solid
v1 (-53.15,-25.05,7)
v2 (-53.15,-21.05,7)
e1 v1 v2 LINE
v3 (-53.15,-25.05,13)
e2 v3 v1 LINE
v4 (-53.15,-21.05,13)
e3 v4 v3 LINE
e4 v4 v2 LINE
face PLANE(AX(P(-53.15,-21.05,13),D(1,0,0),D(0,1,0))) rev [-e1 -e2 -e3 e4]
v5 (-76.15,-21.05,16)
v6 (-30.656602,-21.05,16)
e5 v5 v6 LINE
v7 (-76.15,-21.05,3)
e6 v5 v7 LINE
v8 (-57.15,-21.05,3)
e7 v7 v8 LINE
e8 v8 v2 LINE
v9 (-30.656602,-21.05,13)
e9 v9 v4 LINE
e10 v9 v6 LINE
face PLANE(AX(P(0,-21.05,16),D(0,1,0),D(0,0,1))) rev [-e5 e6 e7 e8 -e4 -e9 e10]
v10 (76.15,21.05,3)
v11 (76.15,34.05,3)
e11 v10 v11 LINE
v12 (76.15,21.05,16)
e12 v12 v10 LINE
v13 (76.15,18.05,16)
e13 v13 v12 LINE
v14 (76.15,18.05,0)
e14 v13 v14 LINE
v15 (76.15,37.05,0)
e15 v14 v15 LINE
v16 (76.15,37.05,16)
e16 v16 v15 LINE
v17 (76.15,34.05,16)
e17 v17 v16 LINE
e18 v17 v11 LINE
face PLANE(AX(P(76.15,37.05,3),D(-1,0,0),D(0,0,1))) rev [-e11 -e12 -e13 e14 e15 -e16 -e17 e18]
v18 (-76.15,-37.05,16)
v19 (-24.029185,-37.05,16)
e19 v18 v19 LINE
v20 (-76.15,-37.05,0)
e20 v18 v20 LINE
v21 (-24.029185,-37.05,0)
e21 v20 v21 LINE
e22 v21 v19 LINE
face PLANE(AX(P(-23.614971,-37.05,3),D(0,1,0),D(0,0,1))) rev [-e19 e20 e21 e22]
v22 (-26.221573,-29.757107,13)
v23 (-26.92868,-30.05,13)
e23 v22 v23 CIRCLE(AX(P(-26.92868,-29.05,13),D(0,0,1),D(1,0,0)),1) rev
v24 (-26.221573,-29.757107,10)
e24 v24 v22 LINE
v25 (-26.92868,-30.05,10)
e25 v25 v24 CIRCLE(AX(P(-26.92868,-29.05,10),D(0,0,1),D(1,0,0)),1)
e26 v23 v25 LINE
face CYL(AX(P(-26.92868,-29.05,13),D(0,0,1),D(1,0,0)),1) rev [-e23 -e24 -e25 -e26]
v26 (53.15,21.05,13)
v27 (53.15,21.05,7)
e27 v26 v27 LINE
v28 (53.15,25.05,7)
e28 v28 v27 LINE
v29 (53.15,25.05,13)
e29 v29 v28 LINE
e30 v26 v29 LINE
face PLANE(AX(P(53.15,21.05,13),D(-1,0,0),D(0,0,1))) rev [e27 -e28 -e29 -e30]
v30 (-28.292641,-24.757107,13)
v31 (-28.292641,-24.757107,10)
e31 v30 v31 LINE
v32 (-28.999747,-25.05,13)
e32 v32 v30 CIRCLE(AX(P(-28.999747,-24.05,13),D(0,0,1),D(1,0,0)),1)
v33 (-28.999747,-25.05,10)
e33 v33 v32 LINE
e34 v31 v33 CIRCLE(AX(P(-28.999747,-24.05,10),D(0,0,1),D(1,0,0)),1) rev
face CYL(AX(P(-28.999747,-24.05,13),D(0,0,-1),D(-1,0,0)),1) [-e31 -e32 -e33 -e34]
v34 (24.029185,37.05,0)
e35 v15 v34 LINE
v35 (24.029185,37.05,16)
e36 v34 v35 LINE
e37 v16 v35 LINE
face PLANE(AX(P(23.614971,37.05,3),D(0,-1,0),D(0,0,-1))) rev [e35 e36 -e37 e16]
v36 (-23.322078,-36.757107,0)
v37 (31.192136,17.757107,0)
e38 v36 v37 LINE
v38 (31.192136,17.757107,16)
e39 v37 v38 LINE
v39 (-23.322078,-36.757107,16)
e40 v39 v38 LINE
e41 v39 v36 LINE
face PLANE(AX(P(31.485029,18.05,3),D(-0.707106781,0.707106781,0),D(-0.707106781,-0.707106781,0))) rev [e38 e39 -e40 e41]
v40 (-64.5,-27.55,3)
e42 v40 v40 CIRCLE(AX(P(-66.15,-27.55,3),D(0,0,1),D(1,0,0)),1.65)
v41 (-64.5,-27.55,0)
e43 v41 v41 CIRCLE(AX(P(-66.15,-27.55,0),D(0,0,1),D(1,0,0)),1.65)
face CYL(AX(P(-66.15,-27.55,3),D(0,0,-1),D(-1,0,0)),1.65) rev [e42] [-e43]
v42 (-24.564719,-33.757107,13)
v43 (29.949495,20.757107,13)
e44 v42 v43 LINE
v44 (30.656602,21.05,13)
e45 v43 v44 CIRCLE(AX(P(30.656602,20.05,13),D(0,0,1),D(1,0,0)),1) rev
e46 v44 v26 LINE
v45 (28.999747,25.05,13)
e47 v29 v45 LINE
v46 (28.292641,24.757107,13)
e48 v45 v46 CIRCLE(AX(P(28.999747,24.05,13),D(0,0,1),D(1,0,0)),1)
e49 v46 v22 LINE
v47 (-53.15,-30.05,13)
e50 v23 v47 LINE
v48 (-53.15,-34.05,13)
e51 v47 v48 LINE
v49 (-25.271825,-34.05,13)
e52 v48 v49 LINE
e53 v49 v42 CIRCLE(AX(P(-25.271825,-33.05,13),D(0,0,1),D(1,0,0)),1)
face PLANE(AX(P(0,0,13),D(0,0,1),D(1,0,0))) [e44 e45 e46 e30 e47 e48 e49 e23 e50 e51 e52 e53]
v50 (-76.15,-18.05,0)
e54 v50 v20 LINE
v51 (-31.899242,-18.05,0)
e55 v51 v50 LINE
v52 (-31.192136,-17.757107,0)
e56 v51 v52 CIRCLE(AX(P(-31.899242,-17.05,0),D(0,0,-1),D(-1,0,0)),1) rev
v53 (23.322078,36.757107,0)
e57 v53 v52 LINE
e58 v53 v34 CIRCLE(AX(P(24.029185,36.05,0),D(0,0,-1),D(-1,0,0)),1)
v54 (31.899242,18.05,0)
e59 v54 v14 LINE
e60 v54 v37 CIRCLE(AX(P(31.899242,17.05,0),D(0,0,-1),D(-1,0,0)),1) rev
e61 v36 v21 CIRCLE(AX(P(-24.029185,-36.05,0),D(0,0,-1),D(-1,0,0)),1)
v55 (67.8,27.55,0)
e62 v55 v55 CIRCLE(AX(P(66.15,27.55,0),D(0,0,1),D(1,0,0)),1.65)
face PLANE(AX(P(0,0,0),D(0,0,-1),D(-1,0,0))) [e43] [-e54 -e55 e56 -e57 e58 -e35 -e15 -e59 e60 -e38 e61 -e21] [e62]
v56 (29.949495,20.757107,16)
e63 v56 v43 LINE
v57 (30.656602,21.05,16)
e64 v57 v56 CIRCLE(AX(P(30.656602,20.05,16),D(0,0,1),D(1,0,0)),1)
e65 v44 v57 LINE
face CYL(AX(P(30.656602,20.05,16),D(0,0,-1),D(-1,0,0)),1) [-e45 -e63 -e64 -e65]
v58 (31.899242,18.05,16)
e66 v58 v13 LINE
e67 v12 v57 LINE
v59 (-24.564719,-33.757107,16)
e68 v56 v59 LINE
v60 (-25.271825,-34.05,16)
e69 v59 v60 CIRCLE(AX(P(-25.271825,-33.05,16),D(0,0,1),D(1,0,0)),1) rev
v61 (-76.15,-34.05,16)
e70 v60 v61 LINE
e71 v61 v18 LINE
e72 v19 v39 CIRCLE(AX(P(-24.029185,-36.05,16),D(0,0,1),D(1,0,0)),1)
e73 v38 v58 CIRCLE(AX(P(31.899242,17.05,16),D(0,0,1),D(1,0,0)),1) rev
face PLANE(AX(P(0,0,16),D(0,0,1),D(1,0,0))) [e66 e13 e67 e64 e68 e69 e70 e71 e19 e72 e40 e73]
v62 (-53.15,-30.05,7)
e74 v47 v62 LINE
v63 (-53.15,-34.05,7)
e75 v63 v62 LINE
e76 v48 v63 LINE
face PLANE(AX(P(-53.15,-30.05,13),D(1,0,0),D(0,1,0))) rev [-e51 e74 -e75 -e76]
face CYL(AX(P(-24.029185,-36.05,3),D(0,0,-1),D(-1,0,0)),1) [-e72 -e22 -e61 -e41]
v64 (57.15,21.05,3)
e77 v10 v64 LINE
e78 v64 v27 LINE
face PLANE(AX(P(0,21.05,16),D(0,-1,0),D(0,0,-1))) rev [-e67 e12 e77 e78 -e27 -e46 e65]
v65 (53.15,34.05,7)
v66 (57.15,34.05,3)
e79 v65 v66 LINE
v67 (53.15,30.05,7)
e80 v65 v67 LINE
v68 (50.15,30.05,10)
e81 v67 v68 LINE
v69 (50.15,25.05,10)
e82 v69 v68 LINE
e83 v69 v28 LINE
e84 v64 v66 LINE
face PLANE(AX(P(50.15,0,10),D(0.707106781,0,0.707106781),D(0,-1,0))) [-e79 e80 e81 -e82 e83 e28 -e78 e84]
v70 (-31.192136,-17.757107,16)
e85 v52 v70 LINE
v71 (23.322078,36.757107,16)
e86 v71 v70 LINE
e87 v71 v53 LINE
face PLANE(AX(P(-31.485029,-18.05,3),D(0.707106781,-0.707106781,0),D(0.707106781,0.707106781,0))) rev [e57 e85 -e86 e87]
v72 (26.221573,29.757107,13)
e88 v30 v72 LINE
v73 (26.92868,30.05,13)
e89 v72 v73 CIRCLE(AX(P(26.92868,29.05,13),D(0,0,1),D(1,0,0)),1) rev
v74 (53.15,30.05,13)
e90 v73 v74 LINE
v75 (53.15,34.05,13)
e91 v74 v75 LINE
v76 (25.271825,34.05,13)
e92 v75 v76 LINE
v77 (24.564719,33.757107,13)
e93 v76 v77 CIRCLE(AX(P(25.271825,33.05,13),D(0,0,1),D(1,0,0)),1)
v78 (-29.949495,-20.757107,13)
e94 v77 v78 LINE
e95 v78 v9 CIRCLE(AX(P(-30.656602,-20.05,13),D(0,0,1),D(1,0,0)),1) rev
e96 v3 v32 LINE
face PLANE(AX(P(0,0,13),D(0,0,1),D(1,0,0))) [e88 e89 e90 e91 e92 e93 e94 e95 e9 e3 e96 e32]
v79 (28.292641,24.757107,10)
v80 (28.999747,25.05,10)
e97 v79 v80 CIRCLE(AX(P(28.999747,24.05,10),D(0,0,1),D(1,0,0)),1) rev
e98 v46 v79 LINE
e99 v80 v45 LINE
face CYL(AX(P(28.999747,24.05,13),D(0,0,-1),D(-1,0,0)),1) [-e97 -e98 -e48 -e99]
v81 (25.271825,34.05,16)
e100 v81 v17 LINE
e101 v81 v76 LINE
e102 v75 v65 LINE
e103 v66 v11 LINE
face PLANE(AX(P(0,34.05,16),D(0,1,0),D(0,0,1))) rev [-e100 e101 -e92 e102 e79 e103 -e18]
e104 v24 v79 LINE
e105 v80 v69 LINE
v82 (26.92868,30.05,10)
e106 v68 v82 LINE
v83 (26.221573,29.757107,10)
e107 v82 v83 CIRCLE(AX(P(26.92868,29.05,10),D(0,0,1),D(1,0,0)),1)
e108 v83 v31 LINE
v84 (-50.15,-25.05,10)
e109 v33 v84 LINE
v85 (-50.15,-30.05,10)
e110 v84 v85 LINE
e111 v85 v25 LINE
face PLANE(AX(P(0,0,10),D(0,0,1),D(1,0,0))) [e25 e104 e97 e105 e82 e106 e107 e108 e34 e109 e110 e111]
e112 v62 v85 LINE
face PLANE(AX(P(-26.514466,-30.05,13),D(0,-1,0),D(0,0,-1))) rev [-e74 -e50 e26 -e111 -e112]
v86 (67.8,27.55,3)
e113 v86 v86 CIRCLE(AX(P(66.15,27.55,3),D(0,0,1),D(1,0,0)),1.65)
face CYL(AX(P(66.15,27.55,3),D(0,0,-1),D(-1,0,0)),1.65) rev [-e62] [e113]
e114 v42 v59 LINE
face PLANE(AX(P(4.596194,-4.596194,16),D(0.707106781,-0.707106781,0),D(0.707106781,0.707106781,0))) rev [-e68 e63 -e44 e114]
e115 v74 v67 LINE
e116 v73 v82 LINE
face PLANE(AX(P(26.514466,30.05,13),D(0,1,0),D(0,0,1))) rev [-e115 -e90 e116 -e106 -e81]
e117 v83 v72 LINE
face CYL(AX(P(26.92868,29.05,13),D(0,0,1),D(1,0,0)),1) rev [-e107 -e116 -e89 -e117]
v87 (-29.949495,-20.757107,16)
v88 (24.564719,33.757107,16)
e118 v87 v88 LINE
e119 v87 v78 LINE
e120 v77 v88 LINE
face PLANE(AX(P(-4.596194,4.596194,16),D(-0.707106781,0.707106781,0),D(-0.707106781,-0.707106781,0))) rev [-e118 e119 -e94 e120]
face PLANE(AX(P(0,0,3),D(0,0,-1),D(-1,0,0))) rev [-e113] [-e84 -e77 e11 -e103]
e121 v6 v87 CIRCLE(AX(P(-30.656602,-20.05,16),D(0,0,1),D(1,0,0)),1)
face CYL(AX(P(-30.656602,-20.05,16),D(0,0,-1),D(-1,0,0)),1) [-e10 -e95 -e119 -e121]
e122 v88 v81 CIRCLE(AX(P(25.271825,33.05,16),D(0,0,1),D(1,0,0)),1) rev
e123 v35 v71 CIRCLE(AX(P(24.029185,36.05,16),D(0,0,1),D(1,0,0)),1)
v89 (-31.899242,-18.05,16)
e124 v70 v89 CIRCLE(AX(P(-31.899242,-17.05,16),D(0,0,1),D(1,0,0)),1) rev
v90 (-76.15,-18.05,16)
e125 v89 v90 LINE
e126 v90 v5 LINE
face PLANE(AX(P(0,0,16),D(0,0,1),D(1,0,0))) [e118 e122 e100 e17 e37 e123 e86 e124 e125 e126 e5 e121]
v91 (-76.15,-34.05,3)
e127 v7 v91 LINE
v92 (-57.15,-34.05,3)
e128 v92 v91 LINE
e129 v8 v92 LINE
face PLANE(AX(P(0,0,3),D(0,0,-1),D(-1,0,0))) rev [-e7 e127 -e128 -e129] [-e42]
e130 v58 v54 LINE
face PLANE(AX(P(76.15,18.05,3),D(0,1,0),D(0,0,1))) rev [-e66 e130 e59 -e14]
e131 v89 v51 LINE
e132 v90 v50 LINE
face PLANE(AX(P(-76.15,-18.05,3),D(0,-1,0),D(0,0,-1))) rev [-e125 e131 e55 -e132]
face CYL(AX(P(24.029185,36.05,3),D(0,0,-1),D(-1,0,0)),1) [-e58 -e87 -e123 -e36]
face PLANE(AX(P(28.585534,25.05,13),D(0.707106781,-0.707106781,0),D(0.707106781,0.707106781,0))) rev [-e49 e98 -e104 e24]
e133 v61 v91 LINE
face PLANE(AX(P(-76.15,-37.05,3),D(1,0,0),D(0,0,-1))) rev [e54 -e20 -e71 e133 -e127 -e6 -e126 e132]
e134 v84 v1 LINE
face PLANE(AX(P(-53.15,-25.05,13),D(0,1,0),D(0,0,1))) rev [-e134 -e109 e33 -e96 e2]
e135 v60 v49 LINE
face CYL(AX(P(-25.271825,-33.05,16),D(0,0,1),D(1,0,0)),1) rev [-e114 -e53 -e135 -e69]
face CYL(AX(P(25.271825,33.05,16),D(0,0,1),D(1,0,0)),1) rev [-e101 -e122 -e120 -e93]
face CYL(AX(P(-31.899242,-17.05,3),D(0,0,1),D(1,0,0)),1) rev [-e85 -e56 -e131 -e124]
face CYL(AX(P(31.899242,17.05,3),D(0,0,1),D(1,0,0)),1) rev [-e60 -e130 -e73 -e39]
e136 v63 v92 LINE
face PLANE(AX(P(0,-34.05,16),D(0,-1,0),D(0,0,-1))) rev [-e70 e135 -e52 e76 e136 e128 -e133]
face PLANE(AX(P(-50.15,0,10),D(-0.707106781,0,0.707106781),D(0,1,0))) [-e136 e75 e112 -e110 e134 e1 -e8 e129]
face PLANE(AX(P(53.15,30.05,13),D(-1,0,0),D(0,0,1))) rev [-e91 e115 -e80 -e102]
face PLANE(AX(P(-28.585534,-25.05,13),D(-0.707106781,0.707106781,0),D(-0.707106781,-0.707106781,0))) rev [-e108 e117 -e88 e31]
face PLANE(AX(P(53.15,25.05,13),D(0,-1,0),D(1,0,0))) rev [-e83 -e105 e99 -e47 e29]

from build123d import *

# Parameters (mm, degrees)
SKETCH_10_R     = 1.65
EXTRUDE_1_DEPTH = 3
EXTRUDE_START   = 3
EXTRUDE_2_DEPTH = 7
EXTRUDE_3_DEPTH = 13
CHAMFER_1_SIZE  = 7
EXTRUDE_5_DEPTH = 10
FILLET_1_R      = 1


with BuildPart() as part:
    # 草图10 → 凸台-拉伸1 (new body)
    with BuildSketch(Plane.XY):
        Polygon((-76.15, -18.05), (-31.485028843, -18.05), (23.614971157, 37.05), (76.15, 37.05), (76.15, 18.05), (31.485028843, 18.05), (-23.614971157, -37.05), (-76.15, -37.05), align=None)
        with Locations((-66.15, -27.55)):
            Circle(SKETCH_10_R, mode=Mode.SUBTRACT)
        with Locations((66.15, 27.55)):
            Circle(SKETCH_10_R, mode=Mode.SUBTRACT)
    extrude(amount=EXTRUDE_1_DEPTH)

    # 草图11 → 凸台-拉伸2 (add)
    with BuildSketch(Plane.XY.offset(EXTRUDE_START)):
        Polygon((-57.15, -18.05), (-57.15, -37.05), (-23.614971157, -37.05), (31.485028843, 18.05), (57.15, 18.05), (57.15, 37.05), (23.614971157, 37.05), (-31.485028843, -18.05), align=None)
    extrude(amount=EXTRUDE_2_DEPTH)

    # 草图12 → 凸台-拉伸3 (add)
    with BuildSketch(Plane.XY.offset(EXTRUDE_START)):
        Polygon((-76.15, -18.05), (-31.485028843, -18.05), (23.614971157, 37.05), (76.15, 37.05), (76.15, 34.05), (24.857611845, 34.05), (-30.242388155, -21.05), (-76.15, -21.05), align=None)
        Polygon((-76.15, -34.05), (-76.15, -37.05), (-23.614971157, -37.05), (31.485028843, 18.05), (76.15, 18.05), (76.15, 21.05), (30.242388155, 21.05), (-24.857611845, -34.05), align=None)
    extrude(amount=EXTRUDE_3_DEPTH)

    # 倒角1
    chamfer_1_edges = [part.edges().sort_by_distance(p)[0] for p in [
        (57.15, 27.55, 10),
        (-57.15, -27.55, 10),
    ]]
    chamfer(chamfer_1_edges, length=CHAMFER_1_SIZE - 0.0001)  # a hair under: the kernel refuses the full size

    # 草图15 → 凸台-拉伸5 (add)
    with BuildSketch(Plane.XY.offset(3)):
        Polygon((-53.15, -21.05), (-53.15, -25.05), (-28.585533906, -25.05), (26.514466094, 30.05), (53.15, 30.05), (53.15, 34.05), (24.857611845, 34.05), (-30.242388155, -21.05), align=None)
        Polygon((-53.15, -30.05), (-53.15, -34.05), (-24.857611845, -34.05), (30.242388155, 21.05), (53.15, 21.05), (53.15, 25.05), (28.585533906, 25.05), (-26.514466094, -30.05), align=None)
    extrude(amount=EXTRUDE_5_DEPTH)

    # 圆角1
    fillet_1_edges = [part.edges().sort_by_distance(p)[0] for p in [
        (-31.485028843, -18.05, 8),
        (23.614971157, 37.05, 8),
        (31.485028843, 18.05, 8),
        (-23.614971157, -37.05, 8),
        (-28.585533906, -25.05, 11.5),
        (26.514466094, 30.05, 11.5),
        (-26.514466094, -30.05, 11.5),
        (28.585533906, 25.05, 11.5),
        (24.857611845, 34.05, 14.5),
        (-30.242388155, -21.05, 14.5),
        (-24.857611845, -34.05, 14.5),
        (30.242388155, 21.05, 14.5),
    ]]
    fillet(fillet_1_edges, radius=FILLET_1_R)


solid = part.part
